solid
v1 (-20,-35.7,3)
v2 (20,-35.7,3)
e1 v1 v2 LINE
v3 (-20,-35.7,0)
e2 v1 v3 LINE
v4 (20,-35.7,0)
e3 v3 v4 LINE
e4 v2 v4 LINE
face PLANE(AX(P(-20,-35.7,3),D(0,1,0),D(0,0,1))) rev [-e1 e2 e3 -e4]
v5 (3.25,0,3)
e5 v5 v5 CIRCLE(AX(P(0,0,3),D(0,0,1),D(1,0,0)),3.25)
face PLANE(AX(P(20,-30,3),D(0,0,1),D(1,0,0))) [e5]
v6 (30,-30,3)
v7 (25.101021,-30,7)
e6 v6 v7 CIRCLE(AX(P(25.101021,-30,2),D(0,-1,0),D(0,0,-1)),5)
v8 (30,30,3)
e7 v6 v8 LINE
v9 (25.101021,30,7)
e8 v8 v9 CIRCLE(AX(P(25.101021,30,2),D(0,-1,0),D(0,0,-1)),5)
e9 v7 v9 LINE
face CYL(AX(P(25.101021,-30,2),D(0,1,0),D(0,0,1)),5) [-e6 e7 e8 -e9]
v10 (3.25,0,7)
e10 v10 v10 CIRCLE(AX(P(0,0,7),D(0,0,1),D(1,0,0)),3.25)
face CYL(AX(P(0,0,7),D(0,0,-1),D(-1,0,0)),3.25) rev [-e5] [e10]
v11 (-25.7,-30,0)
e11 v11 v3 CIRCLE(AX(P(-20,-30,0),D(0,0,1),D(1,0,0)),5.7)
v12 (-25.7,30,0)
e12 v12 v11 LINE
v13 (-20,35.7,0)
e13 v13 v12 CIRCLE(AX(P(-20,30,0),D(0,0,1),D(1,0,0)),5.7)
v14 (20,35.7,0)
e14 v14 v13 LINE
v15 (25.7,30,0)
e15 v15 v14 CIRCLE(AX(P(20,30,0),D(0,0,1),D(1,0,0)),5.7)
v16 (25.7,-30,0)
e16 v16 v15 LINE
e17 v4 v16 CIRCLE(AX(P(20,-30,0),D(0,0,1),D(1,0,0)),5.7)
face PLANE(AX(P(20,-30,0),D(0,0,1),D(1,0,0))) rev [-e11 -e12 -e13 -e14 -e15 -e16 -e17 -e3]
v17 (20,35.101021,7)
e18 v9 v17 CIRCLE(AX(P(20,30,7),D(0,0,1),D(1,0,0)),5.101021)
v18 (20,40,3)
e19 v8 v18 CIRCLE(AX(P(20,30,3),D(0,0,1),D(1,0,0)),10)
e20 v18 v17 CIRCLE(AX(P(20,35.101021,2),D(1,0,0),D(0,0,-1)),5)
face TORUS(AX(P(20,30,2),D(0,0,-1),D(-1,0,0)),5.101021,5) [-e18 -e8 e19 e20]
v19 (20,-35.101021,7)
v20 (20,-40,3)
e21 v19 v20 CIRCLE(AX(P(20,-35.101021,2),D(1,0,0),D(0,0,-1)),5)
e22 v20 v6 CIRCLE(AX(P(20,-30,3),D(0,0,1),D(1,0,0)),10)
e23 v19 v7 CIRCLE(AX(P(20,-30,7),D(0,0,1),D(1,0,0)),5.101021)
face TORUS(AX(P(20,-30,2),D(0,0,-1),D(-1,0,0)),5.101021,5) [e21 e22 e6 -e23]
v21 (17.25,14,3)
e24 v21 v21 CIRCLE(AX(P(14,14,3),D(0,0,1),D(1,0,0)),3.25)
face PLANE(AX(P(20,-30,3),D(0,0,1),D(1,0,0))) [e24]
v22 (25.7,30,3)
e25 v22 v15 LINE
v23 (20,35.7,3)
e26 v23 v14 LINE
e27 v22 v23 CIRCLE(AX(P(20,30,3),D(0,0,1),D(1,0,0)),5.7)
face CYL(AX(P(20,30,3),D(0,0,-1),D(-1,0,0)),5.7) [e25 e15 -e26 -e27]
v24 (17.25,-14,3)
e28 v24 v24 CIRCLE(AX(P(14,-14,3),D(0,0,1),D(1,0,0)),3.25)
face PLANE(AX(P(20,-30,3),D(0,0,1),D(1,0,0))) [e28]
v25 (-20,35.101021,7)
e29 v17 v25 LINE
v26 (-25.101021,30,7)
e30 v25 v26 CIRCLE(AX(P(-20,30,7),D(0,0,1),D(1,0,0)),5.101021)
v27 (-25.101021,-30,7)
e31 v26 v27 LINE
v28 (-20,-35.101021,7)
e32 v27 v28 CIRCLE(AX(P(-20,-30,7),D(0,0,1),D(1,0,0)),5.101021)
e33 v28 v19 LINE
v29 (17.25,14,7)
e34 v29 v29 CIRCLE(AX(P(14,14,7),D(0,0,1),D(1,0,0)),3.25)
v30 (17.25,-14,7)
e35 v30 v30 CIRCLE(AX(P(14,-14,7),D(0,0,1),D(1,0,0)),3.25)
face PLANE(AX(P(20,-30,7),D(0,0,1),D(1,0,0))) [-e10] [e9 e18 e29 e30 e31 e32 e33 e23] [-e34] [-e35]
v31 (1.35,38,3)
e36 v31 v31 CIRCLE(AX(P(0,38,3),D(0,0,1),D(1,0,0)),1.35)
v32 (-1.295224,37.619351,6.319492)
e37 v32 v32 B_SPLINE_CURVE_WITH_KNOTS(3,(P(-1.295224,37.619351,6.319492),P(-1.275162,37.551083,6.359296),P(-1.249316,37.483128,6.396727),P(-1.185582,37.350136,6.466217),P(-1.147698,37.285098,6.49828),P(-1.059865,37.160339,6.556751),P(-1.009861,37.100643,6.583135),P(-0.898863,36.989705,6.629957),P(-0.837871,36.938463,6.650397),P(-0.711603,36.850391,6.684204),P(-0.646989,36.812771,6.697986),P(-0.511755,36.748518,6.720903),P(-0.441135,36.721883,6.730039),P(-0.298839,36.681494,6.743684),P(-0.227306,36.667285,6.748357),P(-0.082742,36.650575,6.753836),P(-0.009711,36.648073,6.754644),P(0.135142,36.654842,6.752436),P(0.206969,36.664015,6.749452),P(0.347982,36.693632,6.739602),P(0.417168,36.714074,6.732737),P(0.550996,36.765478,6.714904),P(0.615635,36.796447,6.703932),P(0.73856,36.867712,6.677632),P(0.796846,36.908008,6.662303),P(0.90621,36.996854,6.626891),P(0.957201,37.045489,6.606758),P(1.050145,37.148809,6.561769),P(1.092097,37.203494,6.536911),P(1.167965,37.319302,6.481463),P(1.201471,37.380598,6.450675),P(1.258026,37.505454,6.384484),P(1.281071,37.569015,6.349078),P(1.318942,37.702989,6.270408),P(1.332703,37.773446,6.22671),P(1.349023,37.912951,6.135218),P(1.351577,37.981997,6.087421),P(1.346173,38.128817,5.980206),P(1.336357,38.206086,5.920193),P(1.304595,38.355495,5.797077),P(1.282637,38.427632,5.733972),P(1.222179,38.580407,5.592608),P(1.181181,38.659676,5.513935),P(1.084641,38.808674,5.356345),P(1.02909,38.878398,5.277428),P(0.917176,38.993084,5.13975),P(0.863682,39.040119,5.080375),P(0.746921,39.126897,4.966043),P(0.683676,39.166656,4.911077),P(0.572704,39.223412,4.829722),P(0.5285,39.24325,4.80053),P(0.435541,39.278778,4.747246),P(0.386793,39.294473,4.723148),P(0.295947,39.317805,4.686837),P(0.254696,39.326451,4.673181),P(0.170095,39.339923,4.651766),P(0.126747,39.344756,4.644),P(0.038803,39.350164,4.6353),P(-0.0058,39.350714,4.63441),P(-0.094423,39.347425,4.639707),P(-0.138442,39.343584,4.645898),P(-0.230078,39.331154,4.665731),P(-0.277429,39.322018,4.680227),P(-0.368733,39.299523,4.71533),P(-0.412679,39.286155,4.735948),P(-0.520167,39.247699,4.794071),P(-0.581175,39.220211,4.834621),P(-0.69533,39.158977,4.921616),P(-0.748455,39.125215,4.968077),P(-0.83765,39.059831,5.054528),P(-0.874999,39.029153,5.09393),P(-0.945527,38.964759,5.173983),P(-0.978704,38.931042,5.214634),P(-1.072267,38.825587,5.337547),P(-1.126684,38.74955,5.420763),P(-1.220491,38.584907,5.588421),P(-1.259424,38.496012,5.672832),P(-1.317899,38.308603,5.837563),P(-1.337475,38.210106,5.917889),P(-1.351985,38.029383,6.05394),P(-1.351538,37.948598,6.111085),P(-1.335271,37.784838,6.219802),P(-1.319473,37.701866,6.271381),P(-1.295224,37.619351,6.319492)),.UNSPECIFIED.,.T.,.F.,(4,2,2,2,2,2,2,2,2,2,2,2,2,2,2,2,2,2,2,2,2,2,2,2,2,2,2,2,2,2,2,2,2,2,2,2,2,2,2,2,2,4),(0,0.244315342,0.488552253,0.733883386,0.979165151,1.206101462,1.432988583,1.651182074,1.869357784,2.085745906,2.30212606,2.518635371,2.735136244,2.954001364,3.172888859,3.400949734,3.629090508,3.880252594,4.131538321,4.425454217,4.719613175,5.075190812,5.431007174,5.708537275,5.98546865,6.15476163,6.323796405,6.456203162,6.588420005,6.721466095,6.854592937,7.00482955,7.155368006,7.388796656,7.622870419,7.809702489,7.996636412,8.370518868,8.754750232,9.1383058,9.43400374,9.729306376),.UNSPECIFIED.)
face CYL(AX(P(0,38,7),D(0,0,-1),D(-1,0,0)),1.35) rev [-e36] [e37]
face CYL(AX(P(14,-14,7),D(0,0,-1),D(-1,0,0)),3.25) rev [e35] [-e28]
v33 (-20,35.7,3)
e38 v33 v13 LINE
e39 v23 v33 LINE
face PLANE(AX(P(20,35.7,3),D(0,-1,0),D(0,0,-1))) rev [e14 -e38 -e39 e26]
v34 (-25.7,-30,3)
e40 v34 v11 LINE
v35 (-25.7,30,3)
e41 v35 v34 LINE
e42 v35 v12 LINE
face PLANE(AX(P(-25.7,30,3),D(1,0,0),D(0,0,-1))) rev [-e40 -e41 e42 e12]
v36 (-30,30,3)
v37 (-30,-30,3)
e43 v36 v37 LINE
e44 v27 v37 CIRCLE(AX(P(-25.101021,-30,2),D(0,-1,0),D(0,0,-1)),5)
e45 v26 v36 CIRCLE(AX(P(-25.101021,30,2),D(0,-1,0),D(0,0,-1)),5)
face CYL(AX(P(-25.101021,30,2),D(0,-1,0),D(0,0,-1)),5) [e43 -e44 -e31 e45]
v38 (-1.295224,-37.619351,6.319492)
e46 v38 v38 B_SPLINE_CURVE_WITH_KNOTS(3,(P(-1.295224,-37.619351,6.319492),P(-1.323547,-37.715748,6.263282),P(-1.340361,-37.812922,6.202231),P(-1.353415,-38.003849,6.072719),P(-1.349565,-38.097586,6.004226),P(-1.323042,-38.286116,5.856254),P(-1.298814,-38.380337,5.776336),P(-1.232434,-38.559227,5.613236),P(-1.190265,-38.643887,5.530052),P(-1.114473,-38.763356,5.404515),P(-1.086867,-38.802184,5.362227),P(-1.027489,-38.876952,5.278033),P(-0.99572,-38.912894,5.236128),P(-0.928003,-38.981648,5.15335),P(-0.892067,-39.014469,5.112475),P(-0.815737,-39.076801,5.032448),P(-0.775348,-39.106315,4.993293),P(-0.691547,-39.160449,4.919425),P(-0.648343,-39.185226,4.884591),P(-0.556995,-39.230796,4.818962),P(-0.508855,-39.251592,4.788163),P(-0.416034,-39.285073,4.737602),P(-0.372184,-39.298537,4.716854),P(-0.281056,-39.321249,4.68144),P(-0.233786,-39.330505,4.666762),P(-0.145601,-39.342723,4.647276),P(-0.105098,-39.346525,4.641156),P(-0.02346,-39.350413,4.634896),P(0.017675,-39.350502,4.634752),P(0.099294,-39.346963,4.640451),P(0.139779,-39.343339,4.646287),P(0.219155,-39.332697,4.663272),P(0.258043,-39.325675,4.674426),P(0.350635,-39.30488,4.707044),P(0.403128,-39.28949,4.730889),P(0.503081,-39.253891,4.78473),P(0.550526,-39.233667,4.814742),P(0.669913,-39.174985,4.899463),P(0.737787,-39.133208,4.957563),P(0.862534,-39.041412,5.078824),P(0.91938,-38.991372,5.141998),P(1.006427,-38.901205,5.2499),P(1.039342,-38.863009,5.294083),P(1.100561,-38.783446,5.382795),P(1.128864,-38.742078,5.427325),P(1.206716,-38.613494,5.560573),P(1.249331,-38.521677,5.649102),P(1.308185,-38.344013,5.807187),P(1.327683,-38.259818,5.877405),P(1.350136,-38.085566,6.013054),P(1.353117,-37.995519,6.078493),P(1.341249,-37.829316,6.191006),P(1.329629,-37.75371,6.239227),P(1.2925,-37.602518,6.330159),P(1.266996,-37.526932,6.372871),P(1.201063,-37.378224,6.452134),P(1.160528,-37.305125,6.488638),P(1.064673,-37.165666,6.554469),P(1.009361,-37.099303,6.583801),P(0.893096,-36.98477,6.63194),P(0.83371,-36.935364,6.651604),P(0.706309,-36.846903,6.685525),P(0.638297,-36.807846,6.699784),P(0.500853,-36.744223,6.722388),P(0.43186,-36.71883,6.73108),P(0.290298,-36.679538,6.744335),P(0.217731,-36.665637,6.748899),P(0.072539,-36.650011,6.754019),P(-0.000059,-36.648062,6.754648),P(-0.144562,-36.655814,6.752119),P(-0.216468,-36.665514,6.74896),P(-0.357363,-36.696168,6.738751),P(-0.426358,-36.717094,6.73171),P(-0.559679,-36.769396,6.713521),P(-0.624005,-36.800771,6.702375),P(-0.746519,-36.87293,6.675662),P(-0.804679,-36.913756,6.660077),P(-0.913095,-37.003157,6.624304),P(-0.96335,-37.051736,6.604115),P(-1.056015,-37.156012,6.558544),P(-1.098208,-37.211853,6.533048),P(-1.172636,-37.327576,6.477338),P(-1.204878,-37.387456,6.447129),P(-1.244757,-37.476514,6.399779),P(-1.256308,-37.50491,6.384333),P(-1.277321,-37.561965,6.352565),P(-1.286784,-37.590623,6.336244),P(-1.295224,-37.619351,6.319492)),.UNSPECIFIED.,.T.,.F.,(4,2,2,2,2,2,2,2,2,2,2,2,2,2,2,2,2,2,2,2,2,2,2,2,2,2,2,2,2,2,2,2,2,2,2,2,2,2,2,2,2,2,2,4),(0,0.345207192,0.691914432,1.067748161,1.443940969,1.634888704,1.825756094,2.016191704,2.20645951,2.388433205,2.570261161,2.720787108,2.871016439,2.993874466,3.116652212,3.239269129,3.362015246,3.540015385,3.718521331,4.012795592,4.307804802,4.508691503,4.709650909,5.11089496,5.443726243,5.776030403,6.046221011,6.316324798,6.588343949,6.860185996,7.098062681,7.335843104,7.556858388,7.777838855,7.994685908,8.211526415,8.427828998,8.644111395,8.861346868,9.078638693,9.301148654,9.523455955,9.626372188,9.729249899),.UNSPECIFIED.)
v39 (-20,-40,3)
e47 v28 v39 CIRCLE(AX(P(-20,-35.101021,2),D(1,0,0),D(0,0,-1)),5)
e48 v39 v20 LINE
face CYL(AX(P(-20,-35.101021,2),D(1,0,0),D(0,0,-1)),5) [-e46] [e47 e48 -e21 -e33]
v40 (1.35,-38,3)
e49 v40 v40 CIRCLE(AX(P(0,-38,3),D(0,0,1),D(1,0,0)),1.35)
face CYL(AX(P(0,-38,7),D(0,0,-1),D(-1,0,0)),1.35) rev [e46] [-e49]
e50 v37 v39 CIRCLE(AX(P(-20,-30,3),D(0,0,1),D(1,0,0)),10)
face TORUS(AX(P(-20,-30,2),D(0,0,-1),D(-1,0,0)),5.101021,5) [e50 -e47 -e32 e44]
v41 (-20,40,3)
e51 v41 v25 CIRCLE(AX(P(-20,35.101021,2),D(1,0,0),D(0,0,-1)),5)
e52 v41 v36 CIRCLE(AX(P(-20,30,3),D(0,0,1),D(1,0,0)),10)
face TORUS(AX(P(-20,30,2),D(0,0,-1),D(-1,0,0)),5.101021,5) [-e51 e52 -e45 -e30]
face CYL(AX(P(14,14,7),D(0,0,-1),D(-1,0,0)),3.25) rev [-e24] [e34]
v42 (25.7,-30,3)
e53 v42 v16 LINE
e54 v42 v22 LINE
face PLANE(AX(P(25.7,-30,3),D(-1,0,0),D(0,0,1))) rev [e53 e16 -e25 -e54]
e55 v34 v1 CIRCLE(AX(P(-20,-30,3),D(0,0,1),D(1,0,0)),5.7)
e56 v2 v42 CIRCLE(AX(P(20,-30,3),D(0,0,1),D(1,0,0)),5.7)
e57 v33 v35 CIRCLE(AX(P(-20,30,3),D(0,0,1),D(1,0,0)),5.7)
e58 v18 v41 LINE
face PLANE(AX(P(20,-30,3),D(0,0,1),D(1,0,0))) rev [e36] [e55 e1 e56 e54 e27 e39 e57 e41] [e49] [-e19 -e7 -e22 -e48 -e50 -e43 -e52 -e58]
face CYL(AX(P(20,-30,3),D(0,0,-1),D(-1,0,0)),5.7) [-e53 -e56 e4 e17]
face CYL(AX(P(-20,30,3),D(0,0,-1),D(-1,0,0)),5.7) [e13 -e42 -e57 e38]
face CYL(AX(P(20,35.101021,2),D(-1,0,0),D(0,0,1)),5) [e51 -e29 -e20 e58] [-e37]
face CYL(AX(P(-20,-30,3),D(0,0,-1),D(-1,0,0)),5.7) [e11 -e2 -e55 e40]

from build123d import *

# Parameters (mm, degrees)
EXTRUDE_1_DEPTH = 3
EXTRUDE_START   = 3
SKETCH_2_R      = 1.35
SKETCH_2_R_2    = 3.25
EXTRUDE_2_DEPTH = 4
FILLET_1_R      = 5


with BuildPart() as part:
    # 草圖1 → 填料-伸長1 (new body)
    with BuildSketch(Plane.XY):
        with BuildLine():
            Line((25.7, -30), (25.7, 30))
            ThreePointArc((25.7, 30), (24.030508653, 34.030508653), (20, 35.7))
            Line((20, 35.7), (-20, 35.7))
            ThreePointArc((-20, 35.7), (-24.030508653, 34.030508653), (-25.7, 30))
            Line((-25.7, 30), (-25.7, -30))
            ThreePointArc((-25.7, -30), (-24.030508653, -34.030508653), (-20, -35.7))
            Line((-20, -35.7), (20, -35.7))
            ThreePointArc((20, -35.7), (24.030508653, -34.030508653), (25.7, -30))
        make_face()
    extrude(amount=EXTRUDE_1_DEPTH)

    # 草圖2 → 填料-伸長2 (add)
    with BuildSketch(Plane.XY.offset(EXTRUDE_START)):
        with BuildLine():
            Line((30, -30), (30, 30))
            ThreePointArc((30, 30), (27.071067812, 37.071067812), (20, 40))
            Line((20, 40), (-20, 40))
            ThreePointArc((-20, 40), (-27.071067812, 37.071067812), (-30, 30))
            Line((-30, 30), (-30, -30))
            ThreePointArc((-30, -30), (-27.071067812, -37.071067812), (-20, -40))
            Line((-20, -40), (20, -40))
            ThreePointArc((20, -40), (27.071067812, -37.071067812), (30, -30))
        make_face()
        with Locations((0, 38)):
            Circle(SKETCH_2_R, mode=Mode.SUBTRACT)
        with Locations((0, -38)):
            Circle(SKETCH_2_R, mode=Mode.SUBTRACT)
        Circle(SKETCH_2_R_2, mode=Mode.SUBTRACT)
        with Locations((14, -14)):
            Circle(SKETCH_2_R_2, mode=Mode.SUBTRACT)
        with Locations((14, 14)):
            Circle(SKETCH_2_R_2, mode=Mode.SUBTRACT)
    extrude(amount=EXTRUDE_2_DEPTH)

    # 圓角1
    # the kernel refuses this fillet: 5 mm, written as the material it takes off along each edge
    with BuildSketch(Plane(origin=(20, -30, 7), x_dir=(0, -1, 0), z_dir=(-1, 0, 0))) as fillet_1_piece_1:
        with BuildLine():
            CenterArc((5.101020514, -5), FILLET_1_R, 11.536959033, 78.463040967)
            Line((5.101020514, 0), (5.101020514, 0.1))
            Line((5.101020514, 0.1), (10, 0.1))
            Line((10, 0.1), (10.1, 0))
            ThreePointArc((10.1, 0), (10.1, -2), (10.09797959, -3.98))
            Line((10.09797959, -3.98), (10, -4))
        make_face()
    revolve(axis=Axis((20, -30, 7), (0, 0, 1)), revolution_arc=90, mode=Mode.SUBTRACT)
    with BuildSketch(Plane(origin=(30, -30, 7), x_dir=(-1.5640821970914211e-12, 0, -1.0), z_dir=(0, 1, 0)), Plane(origin=(-30, 30, 7), x_dir=(1.5640821970914211e-12, 0, -1.0), z_dir=(0, -1, 0))) as fillet_1_piece_2:
        with BuildLine():
            CenterArc((5, 4.898979486), FILLET_1_R, 180, 78.463040967)
            Line((0, 4.898979486), (-0.1, 4.898979486))
            Line((-0.1, 4.898979486), (-0.1, 0))
            Line((-0.1, 0), (0, -0.1))
            ThreePointArc((0, -0.1), (2, -0.1), (3.98, -0.09797959))
            Line((3.98, -0.09797959), (4, 0))
        make_face()
    extrude(amount=60, mode=Mode.SUBTRACT)
    with BuildSketch(Plane(origin=(20, 30, 7), x_dir=(1, 0, 0), z_dir=(0, -1, 0))) as fillet_1_piece_3:
        with BuildLine():
            CenterArc((5.101020514, -5), FILLET_1_R, 11.536959033, 78.463040967)
            Line((5.101020514, 0), (5.101020514, 0.1))
            Line((5.101020514, 0.1), (10, 0.1))
            Line((10, 0.1), (10.1, 0))
            ThreePointArc((10.1, 0), (10.1, -2), (10.09797959, -3.98))
            Line((10.09797959, -3.98), (10, -4))
        make_face()
    revolve(axis=Axis((20, 30, 7), (0, 0, 1)), revolution_arc=90, mode=Mode.SUBTRACT)
    with BuildSketch(Plane(origin=(20, 40, 7), x_dir=(0, -1.5667467323505197e-12, -1.0), z_dir=(-1, 0, 0)), Plane(origin=(-20, -40, 7), x_dir=(0, 1.5667467323505197e-12, -1.0), z_dir=(1, 0, 0))) as fillet_1_piece_4:
        with BuildLine():
            CenterArc((5, 4.898979486), FILLET_1_R, 180, 78.463040967)
            Line((0, 4.898979486), (-0.1, 4.898979486))
            Line((-0.1, 4.898979486), (-0.1, 0))
            Line((-0.1, 0), (0, -0.1))
            ThreePointArc((0, -0.1), (2, -0.1), (3.98, -0.09797959))
            Line((3.98, -0.09797959), (4, 0))
        make_face()
    extrude(amount=40, mode=Mode.SUBTRACT)
    with BuildSketch(Plane(origin=(-20, 30, 7), x_dir=(0, 1, 0), z_dir=(1, 0, 0))) as fillet_1_piece_5:
        with BuildLine():
            CenterArc((5.101020514, -5), FILLET_1_R, 11.536959033, 78.463040967)
            Line((5.101020514, 0), (5.101020514, 0.1))
            Line((5.101020514, 0.1), (10, 0.1))
            Line((10, 0.1), (10.1, 0))
            ThreePointArc((10.1, 0), (10.1, -2), (10.09797959, -3.98))
            Line((10.09797959, -3.98), (10, -4))
        make_face()
    revolve(axis=Axis((-20, 30, 7), (0, 0, 1)), revolution_arc=90, mode=Mode.SUBTRACT)
    with BuildSketch(Plane(origin=(-20, -30, 7), x_dir=(-1, 0, 0), z_dir=(0, 1, 0))) as fillet_1_piece_6:
        with BuildLine():
            CenterArc((5.101020514, -5), FILLET_1_R, 11.536959033, 78.463040967)
            Line((5.101020514, 0), (5.101020514, 0.1))
            Line((5.101020514, 0.1), (10, 0.1))
            Line((10, 0.1), (10.1, 0))
            ThreePointArc((10.1, 0), (10.1, -2), (10.09797959, -3.98))
            Line((10.09797959, -3.98), (10, -4))
        make_face()
    revolve(axis=Axis((-20, -30, 7), (0, 0, 1)), revolution_arc=90, mode=Mode.SUBTRACT)


solid = part.part
